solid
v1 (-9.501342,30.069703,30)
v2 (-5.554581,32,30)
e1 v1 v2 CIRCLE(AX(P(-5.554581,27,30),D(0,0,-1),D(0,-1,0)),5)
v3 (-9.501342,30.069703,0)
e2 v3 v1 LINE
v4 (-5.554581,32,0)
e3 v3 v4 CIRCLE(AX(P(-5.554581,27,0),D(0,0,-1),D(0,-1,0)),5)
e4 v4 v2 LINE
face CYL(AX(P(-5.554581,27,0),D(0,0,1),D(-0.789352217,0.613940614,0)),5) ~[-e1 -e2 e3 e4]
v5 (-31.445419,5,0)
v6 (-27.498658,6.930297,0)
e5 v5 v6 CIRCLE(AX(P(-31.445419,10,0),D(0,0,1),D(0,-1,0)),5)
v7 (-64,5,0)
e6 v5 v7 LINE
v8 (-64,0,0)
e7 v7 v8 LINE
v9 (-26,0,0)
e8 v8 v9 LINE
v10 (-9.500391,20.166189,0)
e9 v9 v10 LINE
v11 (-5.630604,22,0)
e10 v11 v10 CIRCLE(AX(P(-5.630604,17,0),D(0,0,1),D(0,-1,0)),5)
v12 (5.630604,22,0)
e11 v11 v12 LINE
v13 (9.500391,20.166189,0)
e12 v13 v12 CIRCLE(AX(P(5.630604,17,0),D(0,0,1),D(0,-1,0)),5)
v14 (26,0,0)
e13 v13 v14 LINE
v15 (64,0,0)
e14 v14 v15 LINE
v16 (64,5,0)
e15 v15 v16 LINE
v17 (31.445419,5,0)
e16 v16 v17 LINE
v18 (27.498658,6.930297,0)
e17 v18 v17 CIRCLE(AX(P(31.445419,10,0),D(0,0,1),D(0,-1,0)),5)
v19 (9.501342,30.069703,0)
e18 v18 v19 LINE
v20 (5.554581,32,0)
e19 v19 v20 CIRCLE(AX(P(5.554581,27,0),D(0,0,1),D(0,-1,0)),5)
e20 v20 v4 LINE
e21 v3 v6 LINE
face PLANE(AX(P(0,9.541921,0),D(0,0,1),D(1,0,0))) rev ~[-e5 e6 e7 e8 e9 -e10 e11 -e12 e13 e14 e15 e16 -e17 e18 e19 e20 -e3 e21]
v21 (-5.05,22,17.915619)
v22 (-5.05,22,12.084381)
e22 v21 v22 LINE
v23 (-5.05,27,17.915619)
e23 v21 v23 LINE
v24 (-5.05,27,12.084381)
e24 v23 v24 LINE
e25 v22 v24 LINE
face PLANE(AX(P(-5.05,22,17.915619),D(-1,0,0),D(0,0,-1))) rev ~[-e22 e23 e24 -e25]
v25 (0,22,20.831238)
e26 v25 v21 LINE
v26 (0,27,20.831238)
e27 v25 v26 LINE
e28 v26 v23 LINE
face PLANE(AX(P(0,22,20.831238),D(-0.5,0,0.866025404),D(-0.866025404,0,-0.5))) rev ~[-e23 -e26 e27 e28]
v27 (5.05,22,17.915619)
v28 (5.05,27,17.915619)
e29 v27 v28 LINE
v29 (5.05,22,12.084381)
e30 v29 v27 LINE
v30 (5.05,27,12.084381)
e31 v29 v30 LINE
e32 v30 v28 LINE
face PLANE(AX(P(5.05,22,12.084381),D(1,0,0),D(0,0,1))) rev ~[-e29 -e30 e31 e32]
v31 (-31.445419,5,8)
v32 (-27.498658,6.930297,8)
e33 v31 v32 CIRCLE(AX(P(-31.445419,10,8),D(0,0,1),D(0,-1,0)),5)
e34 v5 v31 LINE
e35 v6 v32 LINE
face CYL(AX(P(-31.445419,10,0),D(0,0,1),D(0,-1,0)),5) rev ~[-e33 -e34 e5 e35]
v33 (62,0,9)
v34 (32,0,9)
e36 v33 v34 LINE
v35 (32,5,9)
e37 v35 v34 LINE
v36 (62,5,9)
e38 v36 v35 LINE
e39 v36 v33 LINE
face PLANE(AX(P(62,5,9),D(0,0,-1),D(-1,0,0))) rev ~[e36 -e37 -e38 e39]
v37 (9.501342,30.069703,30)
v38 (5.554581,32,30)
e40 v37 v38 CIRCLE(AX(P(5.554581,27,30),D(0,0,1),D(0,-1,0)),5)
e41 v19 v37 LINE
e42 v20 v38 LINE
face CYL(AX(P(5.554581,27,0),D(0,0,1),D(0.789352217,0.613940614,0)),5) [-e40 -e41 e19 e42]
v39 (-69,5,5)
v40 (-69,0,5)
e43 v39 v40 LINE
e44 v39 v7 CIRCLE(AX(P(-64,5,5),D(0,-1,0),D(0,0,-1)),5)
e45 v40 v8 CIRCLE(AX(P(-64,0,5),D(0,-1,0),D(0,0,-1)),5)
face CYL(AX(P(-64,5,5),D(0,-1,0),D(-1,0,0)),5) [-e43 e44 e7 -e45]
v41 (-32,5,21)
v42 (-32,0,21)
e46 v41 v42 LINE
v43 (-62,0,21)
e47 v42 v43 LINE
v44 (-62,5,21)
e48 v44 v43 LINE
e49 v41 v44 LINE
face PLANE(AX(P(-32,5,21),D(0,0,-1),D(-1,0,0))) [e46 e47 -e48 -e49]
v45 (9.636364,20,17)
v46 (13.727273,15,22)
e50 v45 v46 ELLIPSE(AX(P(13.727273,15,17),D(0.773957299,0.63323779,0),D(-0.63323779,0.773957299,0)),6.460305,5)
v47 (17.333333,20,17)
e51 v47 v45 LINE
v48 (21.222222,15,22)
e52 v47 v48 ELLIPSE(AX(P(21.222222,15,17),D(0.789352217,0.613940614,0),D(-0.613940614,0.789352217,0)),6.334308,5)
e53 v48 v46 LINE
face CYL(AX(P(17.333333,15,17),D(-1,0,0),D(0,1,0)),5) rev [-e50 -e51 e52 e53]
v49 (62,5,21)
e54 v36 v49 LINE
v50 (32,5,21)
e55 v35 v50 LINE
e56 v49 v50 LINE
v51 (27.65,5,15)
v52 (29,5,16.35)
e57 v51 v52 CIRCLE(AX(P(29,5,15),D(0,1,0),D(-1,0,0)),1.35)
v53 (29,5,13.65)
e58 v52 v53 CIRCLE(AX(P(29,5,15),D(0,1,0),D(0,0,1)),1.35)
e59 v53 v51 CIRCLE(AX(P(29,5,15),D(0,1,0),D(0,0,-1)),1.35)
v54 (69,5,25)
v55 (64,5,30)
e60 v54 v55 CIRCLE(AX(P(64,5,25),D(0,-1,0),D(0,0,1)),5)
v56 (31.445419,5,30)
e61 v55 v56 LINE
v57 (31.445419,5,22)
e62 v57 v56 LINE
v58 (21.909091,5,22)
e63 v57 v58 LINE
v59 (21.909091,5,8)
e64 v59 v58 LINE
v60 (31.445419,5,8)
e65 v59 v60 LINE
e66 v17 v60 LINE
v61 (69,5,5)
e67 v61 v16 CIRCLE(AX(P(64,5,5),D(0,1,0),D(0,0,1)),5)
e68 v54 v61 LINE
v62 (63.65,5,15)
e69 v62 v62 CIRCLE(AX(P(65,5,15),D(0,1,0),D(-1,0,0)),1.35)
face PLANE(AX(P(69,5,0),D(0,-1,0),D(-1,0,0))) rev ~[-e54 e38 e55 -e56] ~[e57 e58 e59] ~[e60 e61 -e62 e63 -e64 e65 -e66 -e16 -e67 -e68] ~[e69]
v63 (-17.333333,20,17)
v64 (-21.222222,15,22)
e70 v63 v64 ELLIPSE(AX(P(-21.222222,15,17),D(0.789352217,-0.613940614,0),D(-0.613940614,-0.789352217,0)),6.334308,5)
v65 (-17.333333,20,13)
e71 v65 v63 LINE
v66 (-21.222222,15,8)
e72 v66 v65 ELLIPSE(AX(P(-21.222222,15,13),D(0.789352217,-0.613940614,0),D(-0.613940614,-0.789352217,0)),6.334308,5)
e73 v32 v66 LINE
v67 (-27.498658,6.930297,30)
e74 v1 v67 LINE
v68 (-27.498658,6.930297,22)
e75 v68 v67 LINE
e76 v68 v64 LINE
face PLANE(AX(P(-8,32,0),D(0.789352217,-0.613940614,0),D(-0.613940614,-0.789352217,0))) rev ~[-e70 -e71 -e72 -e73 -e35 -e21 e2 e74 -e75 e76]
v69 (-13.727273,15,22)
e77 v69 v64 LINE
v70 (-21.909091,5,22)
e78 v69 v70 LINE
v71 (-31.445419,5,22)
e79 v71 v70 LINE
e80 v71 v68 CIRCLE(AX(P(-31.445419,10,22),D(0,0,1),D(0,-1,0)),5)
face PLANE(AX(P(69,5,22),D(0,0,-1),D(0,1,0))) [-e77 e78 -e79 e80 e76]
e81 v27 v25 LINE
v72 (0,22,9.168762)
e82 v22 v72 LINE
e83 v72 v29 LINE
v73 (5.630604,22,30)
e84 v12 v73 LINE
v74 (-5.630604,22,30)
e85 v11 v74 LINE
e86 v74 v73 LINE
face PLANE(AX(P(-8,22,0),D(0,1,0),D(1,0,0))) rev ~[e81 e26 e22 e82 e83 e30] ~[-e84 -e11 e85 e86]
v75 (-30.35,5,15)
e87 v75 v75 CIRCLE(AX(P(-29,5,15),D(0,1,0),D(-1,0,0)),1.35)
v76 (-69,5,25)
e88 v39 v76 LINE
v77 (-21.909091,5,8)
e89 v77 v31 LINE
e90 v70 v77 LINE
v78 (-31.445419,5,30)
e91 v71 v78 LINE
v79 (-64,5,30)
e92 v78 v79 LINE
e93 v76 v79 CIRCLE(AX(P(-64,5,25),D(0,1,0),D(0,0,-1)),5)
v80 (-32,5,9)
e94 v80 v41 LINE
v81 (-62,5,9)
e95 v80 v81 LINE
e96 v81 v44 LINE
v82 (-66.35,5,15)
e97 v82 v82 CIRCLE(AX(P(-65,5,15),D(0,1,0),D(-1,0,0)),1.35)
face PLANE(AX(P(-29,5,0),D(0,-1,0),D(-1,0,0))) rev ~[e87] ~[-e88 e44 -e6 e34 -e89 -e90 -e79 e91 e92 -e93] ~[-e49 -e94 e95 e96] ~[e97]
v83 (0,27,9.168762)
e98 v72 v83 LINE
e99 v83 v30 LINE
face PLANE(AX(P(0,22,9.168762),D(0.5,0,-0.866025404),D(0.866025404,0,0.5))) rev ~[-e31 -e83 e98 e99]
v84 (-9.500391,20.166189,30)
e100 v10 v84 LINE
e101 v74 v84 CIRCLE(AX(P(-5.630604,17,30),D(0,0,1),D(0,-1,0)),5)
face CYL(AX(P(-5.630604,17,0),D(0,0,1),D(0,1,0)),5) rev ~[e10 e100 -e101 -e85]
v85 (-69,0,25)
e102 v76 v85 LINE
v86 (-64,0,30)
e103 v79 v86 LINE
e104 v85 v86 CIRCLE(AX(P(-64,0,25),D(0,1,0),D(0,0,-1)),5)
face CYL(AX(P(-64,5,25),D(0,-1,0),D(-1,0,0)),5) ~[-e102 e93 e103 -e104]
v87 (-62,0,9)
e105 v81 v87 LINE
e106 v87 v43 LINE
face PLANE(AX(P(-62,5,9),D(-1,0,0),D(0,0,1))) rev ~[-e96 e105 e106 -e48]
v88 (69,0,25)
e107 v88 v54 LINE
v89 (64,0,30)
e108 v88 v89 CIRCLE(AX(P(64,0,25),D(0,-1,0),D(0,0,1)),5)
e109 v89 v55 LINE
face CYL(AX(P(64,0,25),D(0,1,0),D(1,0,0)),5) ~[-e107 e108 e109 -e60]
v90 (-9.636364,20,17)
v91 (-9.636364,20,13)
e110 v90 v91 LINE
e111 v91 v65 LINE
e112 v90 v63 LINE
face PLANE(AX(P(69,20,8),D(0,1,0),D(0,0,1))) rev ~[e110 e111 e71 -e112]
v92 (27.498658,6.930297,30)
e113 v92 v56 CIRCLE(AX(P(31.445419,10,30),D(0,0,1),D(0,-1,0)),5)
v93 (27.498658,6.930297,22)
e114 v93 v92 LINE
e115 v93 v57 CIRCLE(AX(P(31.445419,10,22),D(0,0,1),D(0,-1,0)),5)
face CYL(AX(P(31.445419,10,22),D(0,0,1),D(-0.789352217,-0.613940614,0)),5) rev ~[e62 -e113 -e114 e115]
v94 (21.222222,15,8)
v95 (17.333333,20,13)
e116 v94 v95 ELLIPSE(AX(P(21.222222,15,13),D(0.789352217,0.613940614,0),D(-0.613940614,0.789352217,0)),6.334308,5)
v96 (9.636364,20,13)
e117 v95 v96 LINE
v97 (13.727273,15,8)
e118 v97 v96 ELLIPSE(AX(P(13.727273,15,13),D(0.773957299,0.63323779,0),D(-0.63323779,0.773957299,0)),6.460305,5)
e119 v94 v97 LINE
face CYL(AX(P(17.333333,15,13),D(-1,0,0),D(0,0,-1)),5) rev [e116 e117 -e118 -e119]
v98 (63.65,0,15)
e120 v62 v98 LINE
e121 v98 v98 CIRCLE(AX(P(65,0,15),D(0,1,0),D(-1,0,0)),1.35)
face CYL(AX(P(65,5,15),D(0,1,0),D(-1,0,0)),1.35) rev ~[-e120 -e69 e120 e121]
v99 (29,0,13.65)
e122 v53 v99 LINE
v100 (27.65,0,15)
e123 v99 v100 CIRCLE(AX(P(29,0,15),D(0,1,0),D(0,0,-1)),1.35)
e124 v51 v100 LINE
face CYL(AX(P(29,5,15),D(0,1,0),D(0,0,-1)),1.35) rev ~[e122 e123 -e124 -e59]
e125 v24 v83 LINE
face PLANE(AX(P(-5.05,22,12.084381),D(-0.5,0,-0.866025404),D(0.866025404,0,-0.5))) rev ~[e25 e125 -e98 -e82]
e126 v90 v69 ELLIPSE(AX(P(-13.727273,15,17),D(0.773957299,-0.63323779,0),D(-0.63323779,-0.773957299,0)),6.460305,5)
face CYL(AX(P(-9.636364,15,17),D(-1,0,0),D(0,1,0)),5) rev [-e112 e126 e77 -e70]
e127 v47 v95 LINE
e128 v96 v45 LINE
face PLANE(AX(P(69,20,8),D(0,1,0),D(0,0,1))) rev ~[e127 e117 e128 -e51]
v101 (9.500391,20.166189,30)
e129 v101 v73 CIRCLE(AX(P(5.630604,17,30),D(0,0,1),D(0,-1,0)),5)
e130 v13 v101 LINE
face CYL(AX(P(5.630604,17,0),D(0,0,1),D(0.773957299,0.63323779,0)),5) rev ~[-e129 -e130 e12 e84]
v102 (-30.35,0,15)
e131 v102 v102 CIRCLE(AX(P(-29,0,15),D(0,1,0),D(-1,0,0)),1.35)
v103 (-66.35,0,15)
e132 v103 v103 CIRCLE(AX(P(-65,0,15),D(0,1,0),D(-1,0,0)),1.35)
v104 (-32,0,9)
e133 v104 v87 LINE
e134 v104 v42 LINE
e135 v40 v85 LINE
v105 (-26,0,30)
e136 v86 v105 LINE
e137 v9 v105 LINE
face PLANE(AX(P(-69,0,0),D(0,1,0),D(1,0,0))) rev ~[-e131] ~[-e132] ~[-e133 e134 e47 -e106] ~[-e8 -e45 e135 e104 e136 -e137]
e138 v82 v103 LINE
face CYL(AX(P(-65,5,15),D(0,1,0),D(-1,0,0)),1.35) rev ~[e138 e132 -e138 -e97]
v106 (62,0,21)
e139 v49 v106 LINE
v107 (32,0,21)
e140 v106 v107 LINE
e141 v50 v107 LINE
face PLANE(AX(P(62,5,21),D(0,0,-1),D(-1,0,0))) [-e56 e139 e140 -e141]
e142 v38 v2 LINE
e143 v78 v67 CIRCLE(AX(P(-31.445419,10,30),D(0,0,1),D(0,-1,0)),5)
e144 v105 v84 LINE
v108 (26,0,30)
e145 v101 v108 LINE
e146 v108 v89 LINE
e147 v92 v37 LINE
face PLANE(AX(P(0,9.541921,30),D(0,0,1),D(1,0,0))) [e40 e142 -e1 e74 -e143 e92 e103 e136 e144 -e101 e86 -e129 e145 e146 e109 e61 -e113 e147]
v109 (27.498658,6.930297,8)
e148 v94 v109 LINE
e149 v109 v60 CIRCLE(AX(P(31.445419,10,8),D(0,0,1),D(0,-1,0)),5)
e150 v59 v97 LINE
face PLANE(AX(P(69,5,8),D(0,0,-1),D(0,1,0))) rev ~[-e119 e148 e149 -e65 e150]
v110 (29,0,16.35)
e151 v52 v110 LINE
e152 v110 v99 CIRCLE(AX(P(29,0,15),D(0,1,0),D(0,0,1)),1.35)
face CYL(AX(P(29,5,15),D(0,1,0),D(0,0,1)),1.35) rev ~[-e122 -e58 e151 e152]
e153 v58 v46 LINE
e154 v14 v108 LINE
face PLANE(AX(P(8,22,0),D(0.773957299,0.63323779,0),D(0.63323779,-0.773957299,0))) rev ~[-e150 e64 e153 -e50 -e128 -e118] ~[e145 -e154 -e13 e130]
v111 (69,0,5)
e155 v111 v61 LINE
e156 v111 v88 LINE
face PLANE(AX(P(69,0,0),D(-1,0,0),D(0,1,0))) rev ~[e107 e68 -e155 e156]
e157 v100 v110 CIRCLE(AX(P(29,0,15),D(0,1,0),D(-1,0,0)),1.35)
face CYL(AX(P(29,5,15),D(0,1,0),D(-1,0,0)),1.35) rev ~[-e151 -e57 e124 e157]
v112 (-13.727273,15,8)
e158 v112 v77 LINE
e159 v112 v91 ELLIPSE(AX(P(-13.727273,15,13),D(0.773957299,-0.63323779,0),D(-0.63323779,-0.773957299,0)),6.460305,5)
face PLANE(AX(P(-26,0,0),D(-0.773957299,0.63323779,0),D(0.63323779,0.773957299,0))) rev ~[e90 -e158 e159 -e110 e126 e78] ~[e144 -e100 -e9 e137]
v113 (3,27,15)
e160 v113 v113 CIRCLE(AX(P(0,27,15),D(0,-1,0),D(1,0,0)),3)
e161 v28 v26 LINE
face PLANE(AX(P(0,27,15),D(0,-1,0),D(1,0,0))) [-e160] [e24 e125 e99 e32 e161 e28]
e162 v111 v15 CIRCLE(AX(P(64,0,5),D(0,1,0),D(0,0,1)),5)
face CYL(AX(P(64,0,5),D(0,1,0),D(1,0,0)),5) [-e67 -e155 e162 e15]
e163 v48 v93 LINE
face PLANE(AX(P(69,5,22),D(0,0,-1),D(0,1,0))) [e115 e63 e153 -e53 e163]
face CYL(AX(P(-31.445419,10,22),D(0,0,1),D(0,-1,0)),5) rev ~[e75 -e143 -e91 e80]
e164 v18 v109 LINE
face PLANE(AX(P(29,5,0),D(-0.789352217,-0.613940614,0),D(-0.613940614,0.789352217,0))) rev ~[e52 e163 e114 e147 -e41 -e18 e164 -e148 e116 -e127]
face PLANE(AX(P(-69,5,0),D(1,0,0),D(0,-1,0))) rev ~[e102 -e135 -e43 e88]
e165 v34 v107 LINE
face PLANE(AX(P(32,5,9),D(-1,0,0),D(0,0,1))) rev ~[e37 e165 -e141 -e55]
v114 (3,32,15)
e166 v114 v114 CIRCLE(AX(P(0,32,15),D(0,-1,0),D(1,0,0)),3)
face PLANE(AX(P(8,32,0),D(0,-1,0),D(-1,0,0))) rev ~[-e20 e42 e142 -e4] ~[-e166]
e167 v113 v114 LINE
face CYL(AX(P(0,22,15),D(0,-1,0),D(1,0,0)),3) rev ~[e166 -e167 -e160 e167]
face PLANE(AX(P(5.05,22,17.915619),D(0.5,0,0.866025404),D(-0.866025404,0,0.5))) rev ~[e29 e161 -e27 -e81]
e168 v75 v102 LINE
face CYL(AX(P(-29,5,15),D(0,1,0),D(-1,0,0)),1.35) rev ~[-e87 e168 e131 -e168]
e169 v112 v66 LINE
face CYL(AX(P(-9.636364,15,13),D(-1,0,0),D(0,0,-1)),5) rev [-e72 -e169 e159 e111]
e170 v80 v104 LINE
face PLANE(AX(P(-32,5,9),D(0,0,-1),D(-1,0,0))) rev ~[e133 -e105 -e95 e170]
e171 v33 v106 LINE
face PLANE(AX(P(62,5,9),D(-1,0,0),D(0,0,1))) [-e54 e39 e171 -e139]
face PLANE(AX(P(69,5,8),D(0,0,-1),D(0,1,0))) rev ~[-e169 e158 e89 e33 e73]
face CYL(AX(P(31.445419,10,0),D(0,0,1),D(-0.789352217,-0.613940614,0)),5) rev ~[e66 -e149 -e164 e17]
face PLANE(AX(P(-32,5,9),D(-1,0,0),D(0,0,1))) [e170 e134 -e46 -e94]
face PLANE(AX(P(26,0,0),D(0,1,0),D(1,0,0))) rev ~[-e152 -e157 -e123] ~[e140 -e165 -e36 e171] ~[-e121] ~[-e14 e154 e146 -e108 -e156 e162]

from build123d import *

# Parameters (mm, degrees)
F1_DEPTH = 30
F3_R     = 3
F4_DEPTH = 25
F5_DEPTH = 5
F6_W     = 15
F6_H     = 14
F7_DEPTH = 160
F8_R     = 5
F2_W     = 30
F2_H     = 12
F2_R     = 1.35
F9_DEPTH = 25


# Not quite as in the source:
# - a feature names something its author has since deleted; it is built from what else it names


with BuildPart() as f1:
    # F0 (on Top) → F1 (new body)
    with BuildSketch(Plane.XY):
        Polygon((29, 5), (8, 32), (-8, 32), (-29, 5), (-69, 5), (-69, 0), (-26, 0), (-8, 22), (8, 22), (26, 0), (69, 0), (69, 5), align=None)
    extrude(amount=F1_DEPTH)

    # F3 (on face) → F4 (cut)
    with BuildSketch(Plane.XZ.offset(-22)):
        with Locations((0, 15)):
            Circle(F3_R)
    extrude(amount=-F4_DEPTH, mode=Mode.SUBTRACT)

    # F3 (on face) → F5 (cut)
    with BuildSketch(Plane.XZ.offset(-22)):
        Polygon((0, 9.1687622812), (5.05, 12.0843811406), (5.05, 17.9156188594), (0, 20.8312377188), (-5.05, 17.9156188594), (-5.05, 12.0843811406), align=None)
        with Locations((0, 15)):
            Circle(F3_R, mode=Mode.SUBTRACT)
    extrude(amount=-F5_DEPTH, mode=Mode.SUBTRACT)

    # F6 (on face) → F7 (cut)
    with BuildSketch(Plane.YZ.offset(69)):
        with Locations((12.5, 15)):
            Rectangle(F6_W, F6_H)
    extrude(amount=-F7_DEPTH, mode=Mode.SUBTRACT)

    # F8
    f8_edges = [f1.edges().sort_by_distance(p)[0] for p in [
        (-8, 32, 15),
        (8, 32, 15),
        (-8, 22, 15),
        (8, 22, 15),
        (29, 5, 26),
        (29, 5, 4),
        (13.484848, 20, 8),
        (13.484848, 20, 22),
        (-13.484848, 20, 8),
        (-13.484848, 20, 22),
        (-29, 5, 4),
        (-29, 5, 26),
        (-69, 2.5, 30),
        (-69, 2.5, 0),
        (69, 2.5, 30),
        (69, 2.5, 0),
    ]]
    fillet(f8_edges, radius=F8_R)

    # F2 (on face) → F9 (cut)
    with BuildSketch(Plane(origin=(0, 5, 0), x_dir=(-1, 0, 0), z_dir=(0, 1, 0))):
        with Locations((47, 15)):
            Rectangle(F2_W, F2_H)
        with Locations((-47, 15)):
            Rectangle(F2_W, F2_H)
        with BuildLine():
            Line((-29, 13.65), (-29, 16.35))
            ThreePointArc((-29, 16.35), (-30.35, 15), (-29, 13.65))
        make_face()
        with BuildLine():
            ThreePointArc((-29, 13.65), (-28.0454058454, 14.0454058454), (-27.65, 15))
            ThreePointArc((-27.65, 15), (-28.0454058454, 15.9545941546), (-29, 16.35))
            Line((-29, 16.35), (-29, 13.65))
        make_face()
        with Locations((-65, 15)):
            Circle(F2_R)
        with Locations((29, 15)):
            Circle(F2_R)
        with Locations((65, 15)):
            Circle(F2_R)
    extrude(amount=-F9_DEPTH, mode=Mode.SUBTRACT)


solid = f1.part
